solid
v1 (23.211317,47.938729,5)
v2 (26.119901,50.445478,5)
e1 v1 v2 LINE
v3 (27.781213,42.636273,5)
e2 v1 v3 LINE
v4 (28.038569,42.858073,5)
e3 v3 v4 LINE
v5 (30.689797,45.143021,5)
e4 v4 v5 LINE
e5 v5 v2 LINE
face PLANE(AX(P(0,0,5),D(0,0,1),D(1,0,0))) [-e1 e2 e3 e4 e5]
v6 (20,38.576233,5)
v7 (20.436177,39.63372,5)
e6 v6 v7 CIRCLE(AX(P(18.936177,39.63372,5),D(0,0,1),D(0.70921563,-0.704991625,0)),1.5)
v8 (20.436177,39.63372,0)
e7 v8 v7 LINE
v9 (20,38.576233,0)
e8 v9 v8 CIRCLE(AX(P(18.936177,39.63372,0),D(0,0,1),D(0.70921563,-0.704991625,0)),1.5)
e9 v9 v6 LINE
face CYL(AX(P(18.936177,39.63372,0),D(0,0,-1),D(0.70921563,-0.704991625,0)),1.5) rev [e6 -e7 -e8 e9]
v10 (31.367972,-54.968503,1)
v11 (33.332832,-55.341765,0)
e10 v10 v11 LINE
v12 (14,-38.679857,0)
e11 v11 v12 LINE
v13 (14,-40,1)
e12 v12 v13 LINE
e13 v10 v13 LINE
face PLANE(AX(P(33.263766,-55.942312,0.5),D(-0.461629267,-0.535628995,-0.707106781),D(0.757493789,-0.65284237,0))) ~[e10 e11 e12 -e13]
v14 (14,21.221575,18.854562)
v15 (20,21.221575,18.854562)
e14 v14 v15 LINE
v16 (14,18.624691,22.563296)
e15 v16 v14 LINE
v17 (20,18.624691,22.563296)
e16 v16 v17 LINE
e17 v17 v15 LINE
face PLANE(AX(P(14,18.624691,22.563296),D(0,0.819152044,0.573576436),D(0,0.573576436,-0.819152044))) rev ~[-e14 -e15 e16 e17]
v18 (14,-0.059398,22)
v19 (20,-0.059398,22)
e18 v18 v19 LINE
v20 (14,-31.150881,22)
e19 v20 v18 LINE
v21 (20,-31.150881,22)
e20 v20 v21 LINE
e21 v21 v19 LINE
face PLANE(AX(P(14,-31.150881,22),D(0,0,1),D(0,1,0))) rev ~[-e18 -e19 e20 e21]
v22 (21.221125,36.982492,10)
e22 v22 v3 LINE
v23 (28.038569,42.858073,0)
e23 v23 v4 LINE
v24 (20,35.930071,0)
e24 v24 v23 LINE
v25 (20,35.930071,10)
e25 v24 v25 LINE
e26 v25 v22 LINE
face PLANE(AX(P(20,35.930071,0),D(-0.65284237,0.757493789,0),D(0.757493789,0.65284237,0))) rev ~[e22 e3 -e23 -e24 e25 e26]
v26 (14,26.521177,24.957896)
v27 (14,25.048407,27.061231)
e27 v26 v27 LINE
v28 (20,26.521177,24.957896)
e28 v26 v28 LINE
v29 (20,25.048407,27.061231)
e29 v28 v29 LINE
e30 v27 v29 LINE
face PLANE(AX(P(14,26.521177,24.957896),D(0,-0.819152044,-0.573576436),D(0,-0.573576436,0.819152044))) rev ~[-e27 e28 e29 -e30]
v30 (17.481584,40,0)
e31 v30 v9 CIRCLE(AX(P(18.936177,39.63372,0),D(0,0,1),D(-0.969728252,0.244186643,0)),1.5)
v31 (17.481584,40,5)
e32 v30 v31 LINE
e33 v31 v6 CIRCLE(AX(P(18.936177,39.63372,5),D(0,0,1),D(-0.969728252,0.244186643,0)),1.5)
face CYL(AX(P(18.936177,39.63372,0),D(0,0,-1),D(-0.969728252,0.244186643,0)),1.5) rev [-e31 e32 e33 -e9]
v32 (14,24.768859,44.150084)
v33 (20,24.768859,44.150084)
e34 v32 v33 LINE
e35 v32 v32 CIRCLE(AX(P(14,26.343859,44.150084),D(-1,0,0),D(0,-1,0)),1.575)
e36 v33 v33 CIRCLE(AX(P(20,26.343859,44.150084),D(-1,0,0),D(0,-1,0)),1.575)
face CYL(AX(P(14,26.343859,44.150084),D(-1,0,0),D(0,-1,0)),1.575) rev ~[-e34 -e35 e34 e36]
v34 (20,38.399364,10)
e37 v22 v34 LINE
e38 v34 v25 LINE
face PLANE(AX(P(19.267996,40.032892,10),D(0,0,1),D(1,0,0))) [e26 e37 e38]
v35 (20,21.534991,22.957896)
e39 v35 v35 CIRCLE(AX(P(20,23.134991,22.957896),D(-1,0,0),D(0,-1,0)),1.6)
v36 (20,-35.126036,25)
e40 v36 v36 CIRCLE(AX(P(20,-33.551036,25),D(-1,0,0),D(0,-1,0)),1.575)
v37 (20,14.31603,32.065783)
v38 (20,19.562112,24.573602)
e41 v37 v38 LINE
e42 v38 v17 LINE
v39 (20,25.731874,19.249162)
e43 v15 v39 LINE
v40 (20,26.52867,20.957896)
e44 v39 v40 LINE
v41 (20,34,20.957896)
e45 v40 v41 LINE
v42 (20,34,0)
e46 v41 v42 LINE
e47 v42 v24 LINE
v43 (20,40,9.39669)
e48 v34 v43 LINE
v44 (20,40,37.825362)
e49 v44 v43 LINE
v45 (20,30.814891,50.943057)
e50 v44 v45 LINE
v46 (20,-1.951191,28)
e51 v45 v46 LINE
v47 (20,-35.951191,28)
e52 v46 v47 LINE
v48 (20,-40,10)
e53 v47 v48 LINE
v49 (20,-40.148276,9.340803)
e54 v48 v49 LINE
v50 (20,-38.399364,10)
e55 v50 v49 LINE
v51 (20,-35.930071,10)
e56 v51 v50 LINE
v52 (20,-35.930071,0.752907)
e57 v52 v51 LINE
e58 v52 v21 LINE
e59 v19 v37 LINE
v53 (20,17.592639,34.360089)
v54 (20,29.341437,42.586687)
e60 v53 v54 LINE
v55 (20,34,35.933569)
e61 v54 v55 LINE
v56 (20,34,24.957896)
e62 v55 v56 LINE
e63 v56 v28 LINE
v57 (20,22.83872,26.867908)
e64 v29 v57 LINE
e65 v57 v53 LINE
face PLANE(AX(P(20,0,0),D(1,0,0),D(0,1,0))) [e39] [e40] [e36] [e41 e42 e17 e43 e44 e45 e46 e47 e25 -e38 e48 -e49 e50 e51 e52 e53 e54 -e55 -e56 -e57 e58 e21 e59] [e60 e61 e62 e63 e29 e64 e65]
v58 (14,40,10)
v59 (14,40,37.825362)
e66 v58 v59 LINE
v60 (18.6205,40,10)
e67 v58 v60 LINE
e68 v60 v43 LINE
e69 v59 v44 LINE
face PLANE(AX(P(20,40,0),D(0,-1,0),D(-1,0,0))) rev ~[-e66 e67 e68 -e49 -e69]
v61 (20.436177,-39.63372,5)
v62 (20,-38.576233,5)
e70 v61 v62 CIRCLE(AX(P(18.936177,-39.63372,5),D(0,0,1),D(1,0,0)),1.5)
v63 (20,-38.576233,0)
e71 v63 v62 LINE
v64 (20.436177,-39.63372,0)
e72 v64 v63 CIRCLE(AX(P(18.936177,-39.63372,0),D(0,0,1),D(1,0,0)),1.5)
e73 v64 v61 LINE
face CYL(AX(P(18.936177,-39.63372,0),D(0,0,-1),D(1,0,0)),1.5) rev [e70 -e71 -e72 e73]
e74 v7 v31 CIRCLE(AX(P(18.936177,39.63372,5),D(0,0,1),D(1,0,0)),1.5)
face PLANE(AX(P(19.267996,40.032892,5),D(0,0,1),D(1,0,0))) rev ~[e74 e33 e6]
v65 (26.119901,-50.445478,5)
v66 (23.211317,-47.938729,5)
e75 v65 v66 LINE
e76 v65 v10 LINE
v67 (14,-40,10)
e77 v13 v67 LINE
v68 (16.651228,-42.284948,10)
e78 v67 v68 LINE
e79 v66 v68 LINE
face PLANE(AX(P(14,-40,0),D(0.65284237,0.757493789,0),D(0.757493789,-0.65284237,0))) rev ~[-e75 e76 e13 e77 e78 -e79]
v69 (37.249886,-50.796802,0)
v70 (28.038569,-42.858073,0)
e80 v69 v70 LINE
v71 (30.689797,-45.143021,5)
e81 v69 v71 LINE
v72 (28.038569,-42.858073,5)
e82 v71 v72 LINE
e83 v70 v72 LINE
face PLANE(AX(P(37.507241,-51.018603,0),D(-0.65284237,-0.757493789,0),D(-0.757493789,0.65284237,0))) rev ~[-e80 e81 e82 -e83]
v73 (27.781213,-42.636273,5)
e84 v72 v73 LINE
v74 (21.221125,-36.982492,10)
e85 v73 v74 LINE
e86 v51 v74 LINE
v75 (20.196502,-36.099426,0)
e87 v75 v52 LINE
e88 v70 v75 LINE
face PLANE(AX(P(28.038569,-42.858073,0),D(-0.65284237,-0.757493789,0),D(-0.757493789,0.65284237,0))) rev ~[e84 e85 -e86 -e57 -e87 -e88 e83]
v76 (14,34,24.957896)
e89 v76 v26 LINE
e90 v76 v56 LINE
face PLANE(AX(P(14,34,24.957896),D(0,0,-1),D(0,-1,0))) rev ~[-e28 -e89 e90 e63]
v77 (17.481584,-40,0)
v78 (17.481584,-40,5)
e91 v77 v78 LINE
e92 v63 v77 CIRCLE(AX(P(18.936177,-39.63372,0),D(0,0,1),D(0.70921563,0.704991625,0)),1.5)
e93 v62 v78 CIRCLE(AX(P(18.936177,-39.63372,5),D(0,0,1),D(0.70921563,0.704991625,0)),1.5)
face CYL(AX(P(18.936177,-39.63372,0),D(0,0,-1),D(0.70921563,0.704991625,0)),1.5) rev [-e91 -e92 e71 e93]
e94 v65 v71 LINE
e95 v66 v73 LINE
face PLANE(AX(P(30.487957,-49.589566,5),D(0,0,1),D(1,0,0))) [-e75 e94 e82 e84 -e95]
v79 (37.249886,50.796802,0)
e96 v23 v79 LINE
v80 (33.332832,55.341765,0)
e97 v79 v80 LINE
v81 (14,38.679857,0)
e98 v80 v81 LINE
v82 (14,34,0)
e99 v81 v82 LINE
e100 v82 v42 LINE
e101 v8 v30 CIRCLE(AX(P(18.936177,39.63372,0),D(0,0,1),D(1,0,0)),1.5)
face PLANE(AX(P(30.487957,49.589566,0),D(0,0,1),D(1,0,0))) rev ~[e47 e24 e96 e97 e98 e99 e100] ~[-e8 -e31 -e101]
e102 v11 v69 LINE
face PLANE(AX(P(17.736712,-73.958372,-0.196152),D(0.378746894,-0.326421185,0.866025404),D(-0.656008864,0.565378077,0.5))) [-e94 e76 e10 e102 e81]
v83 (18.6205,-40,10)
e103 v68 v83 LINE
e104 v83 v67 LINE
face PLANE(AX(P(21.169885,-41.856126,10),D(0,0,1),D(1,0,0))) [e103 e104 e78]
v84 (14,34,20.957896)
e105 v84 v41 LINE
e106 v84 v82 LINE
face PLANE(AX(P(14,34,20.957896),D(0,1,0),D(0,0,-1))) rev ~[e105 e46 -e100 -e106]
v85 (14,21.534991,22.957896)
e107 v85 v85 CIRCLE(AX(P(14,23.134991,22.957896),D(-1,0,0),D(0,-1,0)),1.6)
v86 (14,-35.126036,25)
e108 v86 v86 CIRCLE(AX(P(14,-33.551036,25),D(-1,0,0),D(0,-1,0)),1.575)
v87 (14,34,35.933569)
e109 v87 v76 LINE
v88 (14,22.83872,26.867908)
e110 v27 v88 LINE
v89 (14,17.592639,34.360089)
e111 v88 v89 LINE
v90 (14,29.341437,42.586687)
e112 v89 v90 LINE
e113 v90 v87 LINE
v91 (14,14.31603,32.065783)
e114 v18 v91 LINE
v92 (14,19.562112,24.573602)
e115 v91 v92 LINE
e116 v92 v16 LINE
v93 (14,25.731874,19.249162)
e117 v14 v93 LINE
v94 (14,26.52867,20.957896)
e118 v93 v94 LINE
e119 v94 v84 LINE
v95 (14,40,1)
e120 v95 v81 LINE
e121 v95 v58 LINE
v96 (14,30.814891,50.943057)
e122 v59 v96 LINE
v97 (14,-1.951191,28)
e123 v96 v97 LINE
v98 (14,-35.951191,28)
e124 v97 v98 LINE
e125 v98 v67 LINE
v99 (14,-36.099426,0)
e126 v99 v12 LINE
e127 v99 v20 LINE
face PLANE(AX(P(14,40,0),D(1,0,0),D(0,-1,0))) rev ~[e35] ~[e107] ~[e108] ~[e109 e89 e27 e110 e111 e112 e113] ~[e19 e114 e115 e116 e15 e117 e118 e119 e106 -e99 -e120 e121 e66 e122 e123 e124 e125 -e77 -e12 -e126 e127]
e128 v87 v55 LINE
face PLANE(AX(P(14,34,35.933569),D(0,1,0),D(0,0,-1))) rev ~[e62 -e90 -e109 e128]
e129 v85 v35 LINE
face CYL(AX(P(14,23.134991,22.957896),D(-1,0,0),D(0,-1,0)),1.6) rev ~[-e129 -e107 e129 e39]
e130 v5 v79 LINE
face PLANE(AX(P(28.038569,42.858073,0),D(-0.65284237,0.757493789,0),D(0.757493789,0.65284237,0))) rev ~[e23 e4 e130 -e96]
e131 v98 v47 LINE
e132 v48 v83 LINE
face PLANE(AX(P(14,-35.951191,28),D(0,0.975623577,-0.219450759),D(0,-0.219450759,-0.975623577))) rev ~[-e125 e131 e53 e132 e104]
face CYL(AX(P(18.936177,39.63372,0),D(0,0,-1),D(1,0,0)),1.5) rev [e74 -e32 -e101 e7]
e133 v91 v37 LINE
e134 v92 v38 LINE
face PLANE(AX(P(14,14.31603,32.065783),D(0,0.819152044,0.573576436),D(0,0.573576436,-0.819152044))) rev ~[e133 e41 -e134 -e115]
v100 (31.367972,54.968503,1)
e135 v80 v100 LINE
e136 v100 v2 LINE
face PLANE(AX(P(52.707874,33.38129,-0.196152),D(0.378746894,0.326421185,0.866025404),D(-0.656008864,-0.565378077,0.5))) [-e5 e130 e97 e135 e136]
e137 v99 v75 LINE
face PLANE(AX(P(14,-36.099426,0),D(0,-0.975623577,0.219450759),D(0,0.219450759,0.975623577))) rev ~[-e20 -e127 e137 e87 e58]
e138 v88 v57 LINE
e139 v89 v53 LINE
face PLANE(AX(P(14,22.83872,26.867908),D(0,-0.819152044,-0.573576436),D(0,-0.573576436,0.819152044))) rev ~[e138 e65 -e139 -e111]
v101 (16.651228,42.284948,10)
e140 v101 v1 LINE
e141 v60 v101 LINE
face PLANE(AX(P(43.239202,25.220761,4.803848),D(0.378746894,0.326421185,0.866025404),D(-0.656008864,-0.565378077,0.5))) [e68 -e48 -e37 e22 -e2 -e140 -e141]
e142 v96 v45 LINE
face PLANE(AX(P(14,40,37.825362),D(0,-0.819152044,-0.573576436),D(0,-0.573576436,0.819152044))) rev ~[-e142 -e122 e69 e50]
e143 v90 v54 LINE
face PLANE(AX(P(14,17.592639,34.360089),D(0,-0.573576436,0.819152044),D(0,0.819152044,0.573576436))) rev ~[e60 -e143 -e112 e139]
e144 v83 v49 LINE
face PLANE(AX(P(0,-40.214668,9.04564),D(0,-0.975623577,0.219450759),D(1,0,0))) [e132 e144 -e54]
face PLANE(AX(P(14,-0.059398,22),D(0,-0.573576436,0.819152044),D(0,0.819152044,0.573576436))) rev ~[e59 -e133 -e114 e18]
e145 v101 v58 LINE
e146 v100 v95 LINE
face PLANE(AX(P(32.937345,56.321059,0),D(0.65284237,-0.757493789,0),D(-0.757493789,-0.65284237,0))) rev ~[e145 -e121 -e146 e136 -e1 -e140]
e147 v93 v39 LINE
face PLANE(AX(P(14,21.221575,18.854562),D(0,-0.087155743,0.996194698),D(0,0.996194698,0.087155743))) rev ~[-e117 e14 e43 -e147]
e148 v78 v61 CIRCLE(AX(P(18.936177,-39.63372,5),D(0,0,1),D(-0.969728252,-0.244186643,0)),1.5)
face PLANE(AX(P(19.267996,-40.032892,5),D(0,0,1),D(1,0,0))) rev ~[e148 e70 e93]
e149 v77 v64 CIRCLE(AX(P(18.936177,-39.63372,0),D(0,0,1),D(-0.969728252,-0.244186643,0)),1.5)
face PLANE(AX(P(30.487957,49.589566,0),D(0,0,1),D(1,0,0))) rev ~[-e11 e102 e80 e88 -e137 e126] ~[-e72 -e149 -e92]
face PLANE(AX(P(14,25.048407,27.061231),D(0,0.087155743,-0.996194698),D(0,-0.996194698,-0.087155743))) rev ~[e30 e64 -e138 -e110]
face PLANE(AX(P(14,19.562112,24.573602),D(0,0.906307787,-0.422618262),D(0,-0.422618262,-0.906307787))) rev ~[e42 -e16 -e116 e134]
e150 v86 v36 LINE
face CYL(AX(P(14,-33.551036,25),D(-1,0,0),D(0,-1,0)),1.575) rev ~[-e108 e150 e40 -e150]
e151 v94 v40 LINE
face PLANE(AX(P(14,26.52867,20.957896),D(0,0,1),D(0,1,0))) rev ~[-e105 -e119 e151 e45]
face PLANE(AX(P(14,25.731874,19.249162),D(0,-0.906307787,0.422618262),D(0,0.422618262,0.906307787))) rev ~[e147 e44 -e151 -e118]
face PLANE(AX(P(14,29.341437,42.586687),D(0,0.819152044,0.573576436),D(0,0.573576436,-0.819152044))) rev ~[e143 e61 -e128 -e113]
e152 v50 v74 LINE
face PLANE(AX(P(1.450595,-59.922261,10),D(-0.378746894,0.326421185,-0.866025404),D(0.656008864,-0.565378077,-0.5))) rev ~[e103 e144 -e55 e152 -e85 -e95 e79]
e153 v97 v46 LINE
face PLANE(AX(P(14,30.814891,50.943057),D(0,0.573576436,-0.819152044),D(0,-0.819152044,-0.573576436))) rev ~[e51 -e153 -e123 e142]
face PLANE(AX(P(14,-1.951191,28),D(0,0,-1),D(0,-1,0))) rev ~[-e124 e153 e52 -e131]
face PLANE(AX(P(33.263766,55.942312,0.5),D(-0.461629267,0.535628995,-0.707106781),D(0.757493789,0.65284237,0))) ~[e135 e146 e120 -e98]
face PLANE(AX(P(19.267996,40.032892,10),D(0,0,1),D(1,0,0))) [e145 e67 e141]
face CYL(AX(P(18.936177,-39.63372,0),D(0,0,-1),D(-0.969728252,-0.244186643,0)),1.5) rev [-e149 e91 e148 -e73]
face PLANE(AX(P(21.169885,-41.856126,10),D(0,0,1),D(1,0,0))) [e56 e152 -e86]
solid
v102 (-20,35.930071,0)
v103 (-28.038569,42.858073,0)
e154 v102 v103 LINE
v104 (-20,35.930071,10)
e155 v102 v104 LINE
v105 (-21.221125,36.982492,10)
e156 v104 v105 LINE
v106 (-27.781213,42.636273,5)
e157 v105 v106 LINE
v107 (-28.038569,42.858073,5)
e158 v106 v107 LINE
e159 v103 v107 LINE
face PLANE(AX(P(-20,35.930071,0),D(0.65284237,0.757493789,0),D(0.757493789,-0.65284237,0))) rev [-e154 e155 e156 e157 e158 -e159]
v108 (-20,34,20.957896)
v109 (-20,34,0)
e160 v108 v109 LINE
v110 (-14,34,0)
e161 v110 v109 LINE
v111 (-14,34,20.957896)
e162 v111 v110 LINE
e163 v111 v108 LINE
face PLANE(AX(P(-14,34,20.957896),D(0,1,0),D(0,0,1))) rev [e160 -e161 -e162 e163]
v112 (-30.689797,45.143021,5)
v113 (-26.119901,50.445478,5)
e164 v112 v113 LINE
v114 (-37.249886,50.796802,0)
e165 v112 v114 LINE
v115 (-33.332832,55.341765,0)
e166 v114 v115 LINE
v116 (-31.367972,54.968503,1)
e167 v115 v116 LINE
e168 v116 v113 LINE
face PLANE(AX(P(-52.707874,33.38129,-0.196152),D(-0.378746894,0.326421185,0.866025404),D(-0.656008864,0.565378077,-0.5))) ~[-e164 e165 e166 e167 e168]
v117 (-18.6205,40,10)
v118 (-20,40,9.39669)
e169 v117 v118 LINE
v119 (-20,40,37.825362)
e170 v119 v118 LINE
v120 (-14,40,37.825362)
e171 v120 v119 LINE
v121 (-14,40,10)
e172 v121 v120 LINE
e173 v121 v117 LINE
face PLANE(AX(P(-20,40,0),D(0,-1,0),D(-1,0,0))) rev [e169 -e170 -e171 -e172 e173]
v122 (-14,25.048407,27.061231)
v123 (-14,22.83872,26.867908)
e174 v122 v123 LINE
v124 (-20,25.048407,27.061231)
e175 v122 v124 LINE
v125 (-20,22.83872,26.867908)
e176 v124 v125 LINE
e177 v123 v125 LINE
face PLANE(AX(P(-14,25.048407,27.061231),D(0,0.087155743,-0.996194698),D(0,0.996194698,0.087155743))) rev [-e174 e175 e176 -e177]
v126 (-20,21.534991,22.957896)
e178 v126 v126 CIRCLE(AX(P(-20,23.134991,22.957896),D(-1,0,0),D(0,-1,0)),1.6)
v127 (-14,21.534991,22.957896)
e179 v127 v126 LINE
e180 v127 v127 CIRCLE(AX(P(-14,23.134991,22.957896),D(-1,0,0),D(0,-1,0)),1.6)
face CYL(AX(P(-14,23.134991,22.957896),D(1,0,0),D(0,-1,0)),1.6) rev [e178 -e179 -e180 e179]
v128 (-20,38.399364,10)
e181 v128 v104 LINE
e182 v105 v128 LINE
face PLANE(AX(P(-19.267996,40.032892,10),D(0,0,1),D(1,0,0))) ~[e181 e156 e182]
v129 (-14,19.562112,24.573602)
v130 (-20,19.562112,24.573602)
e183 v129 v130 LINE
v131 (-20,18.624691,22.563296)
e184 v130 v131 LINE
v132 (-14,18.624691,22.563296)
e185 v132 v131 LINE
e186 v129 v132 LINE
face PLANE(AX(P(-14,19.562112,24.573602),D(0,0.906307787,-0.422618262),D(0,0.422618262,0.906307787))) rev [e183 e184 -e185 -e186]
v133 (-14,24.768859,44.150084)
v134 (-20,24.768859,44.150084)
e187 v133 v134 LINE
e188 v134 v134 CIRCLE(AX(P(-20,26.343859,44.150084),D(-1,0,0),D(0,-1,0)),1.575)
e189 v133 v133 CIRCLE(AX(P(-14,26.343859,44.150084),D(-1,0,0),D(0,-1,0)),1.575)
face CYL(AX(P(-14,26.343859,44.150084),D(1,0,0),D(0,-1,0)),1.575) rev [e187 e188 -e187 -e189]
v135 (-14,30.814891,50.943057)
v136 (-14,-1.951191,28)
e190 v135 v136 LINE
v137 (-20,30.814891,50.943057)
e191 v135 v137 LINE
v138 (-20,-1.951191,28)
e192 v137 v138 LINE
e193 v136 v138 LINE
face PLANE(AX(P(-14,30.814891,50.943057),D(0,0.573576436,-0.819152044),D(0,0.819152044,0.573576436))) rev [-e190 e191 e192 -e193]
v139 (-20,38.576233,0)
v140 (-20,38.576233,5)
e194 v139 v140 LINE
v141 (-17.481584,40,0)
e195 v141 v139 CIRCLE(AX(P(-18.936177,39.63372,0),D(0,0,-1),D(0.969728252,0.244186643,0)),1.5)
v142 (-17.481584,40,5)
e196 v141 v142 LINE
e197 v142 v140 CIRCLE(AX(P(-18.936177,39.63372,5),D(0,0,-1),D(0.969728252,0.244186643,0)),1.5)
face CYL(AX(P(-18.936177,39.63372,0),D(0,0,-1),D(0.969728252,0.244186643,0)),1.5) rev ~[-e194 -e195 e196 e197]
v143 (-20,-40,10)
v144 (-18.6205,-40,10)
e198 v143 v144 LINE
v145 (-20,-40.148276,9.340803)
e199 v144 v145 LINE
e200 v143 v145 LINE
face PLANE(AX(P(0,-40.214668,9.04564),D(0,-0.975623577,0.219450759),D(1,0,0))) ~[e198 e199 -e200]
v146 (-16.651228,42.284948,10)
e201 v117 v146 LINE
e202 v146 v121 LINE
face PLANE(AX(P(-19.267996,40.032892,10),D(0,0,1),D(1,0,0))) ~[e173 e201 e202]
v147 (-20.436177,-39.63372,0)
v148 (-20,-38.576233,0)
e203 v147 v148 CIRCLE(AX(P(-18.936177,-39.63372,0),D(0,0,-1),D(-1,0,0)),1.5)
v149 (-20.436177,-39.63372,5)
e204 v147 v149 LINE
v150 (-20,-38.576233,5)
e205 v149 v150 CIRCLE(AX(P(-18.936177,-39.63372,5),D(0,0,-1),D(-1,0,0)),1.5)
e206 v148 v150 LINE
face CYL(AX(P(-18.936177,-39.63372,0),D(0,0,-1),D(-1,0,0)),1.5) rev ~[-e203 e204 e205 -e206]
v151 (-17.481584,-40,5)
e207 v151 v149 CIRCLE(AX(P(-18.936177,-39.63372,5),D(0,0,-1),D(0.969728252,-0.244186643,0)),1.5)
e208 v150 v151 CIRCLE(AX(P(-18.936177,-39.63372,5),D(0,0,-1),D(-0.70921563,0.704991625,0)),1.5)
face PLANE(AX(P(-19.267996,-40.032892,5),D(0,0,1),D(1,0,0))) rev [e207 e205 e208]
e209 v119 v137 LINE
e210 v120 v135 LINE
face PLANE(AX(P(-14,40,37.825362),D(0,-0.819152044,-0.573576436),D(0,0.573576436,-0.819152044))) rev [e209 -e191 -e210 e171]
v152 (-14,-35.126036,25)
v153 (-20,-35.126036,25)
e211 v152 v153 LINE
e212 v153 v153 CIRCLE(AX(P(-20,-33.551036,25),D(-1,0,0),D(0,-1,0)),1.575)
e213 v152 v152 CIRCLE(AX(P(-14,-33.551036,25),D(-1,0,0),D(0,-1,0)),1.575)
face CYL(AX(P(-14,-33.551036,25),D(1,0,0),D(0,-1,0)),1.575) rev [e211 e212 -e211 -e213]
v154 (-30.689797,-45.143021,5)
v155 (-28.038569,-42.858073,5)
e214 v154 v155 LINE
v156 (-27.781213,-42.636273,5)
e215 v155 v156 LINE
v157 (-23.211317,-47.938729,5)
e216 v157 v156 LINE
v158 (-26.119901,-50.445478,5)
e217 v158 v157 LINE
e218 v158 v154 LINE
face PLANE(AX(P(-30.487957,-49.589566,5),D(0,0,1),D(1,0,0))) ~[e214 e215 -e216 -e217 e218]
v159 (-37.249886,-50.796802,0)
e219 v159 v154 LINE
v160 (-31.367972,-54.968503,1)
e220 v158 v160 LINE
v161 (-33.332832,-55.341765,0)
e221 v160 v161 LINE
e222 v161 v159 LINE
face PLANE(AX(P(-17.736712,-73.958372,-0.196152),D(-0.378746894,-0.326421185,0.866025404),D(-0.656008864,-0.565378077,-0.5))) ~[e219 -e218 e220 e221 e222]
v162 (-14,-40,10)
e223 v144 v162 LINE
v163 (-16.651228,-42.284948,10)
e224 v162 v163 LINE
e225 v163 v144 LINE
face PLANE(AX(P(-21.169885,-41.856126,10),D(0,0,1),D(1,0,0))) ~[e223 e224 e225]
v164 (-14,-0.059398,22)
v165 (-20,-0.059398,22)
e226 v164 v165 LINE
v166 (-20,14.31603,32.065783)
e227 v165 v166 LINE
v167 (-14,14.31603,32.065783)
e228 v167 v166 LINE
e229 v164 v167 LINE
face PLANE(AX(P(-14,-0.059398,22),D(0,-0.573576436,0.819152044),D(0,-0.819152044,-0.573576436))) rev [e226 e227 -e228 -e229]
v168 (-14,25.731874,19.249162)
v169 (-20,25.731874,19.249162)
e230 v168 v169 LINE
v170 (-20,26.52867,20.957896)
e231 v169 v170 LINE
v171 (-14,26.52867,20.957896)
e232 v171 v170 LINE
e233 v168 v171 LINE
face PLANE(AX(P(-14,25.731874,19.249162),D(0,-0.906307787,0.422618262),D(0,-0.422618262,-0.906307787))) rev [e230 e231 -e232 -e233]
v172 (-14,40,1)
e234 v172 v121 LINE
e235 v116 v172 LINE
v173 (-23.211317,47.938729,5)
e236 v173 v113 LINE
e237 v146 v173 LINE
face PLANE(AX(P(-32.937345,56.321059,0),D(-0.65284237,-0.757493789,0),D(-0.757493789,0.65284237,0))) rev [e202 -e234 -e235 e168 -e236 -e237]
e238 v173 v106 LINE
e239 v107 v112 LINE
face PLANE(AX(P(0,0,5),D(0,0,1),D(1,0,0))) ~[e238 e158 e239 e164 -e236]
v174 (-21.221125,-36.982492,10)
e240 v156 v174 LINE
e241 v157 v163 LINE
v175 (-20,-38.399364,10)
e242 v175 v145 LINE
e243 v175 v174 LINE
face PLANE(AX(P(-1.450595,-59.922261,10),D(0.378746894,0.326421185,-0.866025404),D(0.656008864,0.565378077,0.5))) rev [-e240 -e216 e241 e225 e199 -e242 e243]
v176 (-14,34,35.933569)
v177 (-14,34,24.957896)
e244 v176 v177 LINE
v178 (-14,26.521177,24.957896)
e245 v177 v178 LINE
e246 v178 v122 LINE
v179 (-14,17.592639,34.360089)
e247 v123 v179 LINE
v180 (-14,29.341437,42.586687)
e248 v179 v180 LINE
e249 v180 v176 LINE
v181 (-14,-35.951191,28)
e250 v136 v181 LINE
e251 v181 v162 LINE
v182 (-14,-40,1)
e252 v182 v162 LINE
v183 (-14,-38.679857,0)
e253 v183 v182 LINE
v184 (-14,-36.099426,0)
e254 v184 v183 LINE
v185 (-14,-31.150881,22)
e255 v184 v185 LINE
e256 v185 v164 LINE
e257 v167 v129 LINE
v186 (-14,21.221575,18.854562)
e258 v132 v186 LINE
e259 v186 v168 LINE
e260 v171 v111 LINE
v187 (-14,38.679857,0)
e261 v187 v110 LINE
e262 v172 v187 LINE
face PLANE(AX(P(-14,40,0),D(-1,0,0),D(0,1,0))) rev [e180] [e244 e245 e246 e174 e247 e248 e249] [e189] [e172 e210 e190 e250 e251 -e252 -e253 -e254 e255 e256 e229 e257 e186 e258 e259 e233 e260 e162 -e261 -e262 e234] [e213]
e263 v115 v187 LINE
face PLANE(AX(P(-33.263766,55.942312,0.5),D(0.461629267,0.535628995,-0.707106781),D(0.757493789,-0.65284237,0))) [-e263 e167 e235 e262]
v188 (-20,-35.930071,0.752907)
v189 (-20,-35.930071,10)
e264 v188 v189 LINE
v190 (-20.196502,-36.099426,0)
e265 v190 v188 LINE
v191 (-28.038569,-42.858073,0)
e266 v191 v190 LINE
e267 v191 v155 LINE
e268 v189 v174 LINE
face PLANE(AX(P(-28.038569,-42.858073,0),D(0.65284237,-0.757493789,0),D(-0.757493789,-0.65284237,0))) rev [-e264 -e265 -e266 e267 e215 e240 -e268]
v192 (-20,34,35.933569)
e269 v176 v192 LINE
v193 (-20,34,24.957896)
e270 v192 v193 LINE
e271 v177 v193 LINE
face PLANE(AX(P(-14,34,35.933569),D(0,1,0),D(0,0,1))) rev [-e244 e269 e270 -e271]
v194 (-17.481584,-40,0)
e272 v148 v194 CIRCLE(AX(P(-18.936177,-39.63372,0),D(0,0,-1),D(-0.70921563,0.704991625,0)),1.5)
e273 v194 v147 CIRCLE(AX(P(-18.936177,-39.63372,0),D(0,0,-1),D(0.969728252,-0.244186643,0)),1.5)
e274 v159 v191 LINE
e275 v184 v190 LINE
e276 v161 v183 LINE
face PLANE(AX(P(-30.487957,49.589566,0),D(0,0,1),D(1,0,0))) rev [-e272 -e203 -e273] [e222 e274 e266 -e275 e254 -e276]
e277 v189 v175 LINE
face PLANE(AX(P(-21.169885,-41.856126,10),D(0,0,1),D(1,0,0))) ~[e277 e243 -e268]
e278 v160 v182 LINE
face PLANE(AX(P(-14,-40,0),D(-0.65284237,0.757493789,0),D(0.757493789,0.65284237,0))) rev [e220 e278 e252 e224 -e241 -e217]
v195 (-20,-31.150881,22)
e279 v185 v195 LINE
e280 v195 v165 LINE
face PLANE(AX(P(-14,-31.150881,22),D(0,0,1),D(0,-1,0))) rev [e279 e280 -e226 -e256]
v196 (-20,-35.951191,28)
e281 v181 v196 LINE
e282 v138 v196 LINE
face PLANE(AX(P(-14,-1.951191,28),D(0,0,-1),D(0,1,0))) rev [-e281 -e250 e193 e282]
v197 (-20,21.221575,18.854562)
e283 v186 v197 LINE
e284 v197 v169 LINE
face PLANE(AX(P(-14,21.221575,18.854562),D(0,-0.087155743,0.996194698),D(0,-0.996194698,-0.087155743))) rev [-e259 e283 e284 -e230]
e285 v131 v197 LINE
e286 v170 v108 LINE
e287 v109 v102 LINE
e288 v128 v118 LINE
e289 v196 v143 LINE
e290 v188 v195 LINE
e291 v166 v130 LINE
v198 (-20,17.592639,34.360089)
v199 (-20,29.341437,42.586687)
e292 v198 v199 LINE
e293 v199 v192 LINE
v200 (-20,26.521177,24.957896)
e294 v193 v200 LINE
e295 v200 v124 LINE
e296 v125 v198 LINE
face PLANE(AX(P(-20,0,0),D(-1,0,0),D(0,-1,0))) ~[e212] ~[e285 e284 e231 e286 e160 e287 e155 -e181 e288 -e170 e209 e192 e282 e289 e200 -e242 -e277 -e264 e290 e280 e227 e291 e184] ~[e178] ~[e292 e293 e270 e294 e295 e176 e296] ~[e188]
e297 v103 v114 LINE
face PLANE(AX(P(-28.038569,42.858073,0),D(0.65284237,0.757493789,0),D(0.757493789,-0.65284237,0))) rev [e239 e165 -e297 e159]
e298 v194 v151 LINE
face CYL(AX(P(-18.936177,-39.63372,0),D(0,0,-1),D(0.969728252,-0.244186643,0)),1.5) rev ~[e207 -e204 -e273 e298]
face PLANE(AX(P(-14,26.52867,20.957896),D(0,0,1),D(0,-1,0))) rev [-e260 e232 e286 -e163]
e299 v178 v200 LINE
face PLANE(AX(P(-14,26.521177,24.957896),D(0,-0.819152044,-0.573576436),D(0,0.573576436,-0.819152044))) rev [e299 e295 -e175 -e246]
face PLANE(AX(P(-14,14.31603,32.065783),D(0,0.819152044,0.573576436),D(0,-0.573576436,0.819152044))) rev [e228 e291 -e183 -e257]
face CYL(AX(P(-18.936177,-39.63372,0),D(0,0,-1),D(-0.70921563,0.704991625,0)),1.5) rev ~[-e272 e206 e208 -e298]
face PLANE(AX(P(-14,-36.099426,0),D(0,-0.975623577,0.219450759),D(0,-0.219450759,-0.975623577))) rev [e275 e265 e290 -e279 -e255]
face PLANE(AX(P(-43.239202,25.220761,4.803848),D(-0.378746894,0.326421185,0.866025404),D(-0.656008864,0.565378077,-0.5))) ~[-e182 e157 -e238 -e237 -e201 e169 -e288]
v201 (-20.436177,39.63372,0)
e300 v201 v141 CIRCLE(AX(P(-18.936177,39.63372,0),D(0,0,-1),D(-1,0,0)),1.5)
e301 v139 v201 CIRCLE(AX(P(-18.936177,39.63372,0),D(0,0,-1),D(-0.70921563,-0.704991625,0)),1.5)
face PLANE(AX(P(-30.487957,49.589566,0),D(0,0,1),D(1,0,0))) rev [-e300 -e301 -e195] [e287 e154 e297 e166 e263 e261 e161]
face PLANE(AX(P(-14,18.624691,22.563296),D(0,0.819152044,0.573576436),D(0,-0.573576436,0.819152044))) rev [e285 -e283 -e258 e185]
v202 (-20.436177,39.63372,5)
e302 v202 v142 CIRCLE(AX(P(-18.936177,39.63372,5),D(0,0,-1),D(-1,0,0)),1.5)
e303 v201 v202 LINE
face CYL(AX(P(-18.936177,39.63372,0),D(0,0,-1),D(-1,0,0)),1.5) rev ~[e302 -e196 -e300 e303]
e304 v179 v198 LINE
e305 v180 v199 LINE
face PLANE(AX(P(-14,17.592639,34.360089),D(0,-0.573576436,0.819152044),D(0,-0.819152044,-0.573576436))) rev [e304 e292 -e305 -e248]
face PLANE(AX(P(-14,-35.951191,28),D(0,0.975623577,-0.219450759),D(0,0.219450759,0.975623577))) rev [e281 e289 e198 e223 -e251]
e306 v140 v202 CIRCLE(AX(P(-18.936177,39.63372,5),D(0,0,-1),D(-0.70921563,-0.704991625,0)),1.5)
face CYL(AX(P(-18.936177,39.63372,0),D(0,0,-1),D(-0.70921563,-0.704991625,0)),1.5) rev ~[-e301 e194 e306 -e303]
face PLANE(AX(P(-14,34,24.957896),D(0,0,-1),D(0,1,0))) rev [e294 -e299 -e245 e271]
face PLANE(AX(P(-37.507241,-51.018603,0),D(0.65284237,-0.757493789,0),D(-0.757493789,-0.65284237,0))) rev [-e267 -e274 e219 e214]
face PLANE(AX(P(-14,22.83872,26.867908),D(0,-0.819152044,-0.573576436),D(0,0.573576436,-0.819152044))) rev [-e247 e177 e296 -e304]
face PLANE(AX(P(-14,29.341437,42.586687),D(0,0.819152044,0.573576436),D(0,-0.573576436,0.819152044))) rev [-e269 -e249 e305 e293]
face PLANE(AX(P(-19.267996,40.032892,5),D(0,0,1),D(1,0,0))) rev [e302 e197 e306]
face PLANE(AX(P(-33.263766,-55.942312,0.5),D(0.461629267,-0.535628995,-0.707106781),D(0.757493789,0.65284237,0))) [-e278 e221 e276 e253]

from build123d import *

# Parameters (mm, degrees)
F1_DEPTH     = 70
F2_DEPTH     = 10
F3_DEPTH     = 5
F4_R         = 1.6
F4_R_2       = 1.575
F5_DEPTH     = 25
F6_DEPTH     = 5
F7_SIZE      = 1
F8_T1_DEPTH  = 53.5675435836
F8_T6_DEPTH  = 53.5675435836
F8_T13_DEPTH = 53.5675435836
F8_T19_DEPTH = 53.5675435836
F8_T26_DEPTH = 53.5675435836
F8_T33_DEPTH = 53.5675435836
F9_T1_DEPTH  = 53.5675435836
F9_T6_DEPTH  = 53.5675435836
F9_T12_DEPTH = 53.5675435836
F9_T19_DEPTH = 53.5675435836
F9_T26_DEPTH = 53.5675435836
F9_T32_DEPTH = 53.5675435836


# Not quite as in the source:
# - a fillet or chamfer that OpenCascade refuses, or shapes differently, is made with other operations: its cross-section is extruded or revolved along the edge and cut away or added


with BuildPart() as f1:
    # F0 (on Top) → F1 (new body)
    with BuildSketch(Plane.XY):
        with BuildLine():
            Line((17.481584177, 40), (14, 40))
            Line((14, 40), (18.5698965916, 34.6975434805))
            Line((18.5698965916, 34.6975434805), (20, 35.9300712093))
            Line((20, 35.9300712093), (20, 38.5762325992))
            ThreePointArc((20, 38.5762325992), (18.1979669018, 38.327945742), (17.481584177, 40))
        make_face()
        with BuildLine():
            Line((20, 40), (17.481584177, 40))
            ThreePointArc((17.481584177, 40), (18.1979669018, 38.327945742), (20, 38.5762325992))
            Line((20, 38.5762325992), (20, 40))
        make_face()
        Polygon((18.5698965916, 34.6975434805), (14, 40), (14, 0), (14, -40), (18.5698965916, -34.6975434805), (20, -35.9300712093), (20, 0), (20, 35.9300712093), align=None)
        with BuildLine():
            Line((18.5698965916, -34.6975434805), (14, -40))
            Line((14, -40), (17.481584177, -40))
            ThreePointArc((17.481584177, -40), (18.1979669018, -38.327945742), (20, -38.5762325992))
            Line((20, -38.5762325992), (20, -35.9300712093))
            Line((20, -35.9300712093), (18.5698965916, -34.6975434805))
        make_face()
        with BuildLine():
            ThreePointArc((20, -38.5762325992), (18.1979669018, -38.327945742), (17.481584177, -40))
            Line((17.481584177, -40), (20, -40))
            Line((20, -40), (20, -38.5762325992))
        make_face()
    extrude(amount=F1_DEPTH)

    # F0 (on Top) → F2 (join)
    with BuildSketch(Plane.XY):
        with BuildLine():
            ThreePointArc((20.4361765556, 39.633720036), (19.1207184642, 41.1223248473), (17.481584177, 40))
            Line((17.481584177, 40), (20, 40))
            Line((20, 40), (20, 38.5762325992))
            ThreePointArc((20, 38.5762325992), (20.3228515656, 39.0617651281), (20.4361765556, 39.633720036))
        make_face()
        with BuildLine():
            Line((23.4686723563, 48.1605296279), (14, 40))
            Line((14, 40), (17.481584177, 40))
            ThreePointArc((17.481584177, 40), (19.1207184642, 41.1223248473), (20.4361765556, 39.633720036))
            ThreePointArc((20.4361765556, 39.633720036), (20.3228515656, 39.0617651281), (20, 38.5762325992))
            Line((20, 38.5762325992), (20, 35.9300712093))
            Line((20, 35.9300712093), (28.038568948, 42.8580731084))
            Line((28.038568948, 42.8580731084), (23.4686723563, 48.1605296279))
        make_face()
        with BuildLine():
            Line((17.481584177, -40), (14, -40))
            Line((14, -40), (23.4686723563, -48.1605296279))
            Line((23.4686723563, -48.1605296279), (28.038568948, -42.8580731084))
            Line((28.038568948, -42.8580731084), (20, -35.9300712093))
            Line((20, -35.9300712093), (20, -38.5762325992))
            ThreePointArc((20, -38.5762325992), (20.3228515656, -39.0617651281), (20.4361765556, -39.633720036))
            ThreePointArc((20.4361765556, -39.633720036), (19.1207184642, -41.1223248473), (17.481584177, -40))
        make_face()
        with BuildLine():
            Line((20, -40), (17.481584177, -40))
            ThreePointArc((17.481584177, -40), (19.1207184642, -41.1223248473), (20.4361765556, -39.633720036))
            ThreePointArc((20.4361765556, -39.633720036), (20.3228515656, -39.0617651281), (20, -38.5762325992))
            Line((20, -38.5762325992), (20, -40))
        make_face()
    extrude(amount=F2_DEPTH)

    # F0 (on Top) → F3 (join)
    with BuildSketch(Plane.XY):
        Polygon((32.9373447127, 56.3210592559), (23.4686723563, 48.1605296279), (28.038568948, 42.8580731084), (37.5072413043, 51.0186027363), align=None)
        Polygon((28.038568948, -42.8580731084), (23.4686723563, -48.1605296279), (32.9373447127, -56.3210592559), (37.5072413043, -51.0186027363), align=None)
    extrude(amount=F3_DEPTH)

    # F4 (on face) → F5 (cut)
    with BuildSketch(Plane(origin=(14, 0, 0), x_dir=(0, -1, 0), z_dir=(-1, 0, 0))):
        Polygon((-34, 0), (36.0994255375, 0), (31.1508810268, 22), (0.0593981216, 22), (-14.3160304975, 32.0657834841), (-19.5621121893, 24.5736023727), (-18.6246911161, 22.5632963938), (-21.2215746664, 18.8545623277), (-25.7318743586, 19.2491624199), (-26.5286701393, 20.9578964859), (-34, 20.9578964859), align=None)
        Polygon((-30.8148909167, 50.943057454), (1.9511908549, 28), (35.9511908549, 28), (40, 10), (40, 70), (-40, 70), (-40, 37.825362225), align=None)
        Polygon((-34, 24.9578964859), (-26.5211773832, 24.9578964859), (-25.0484069503, 27.0612306442), (-22.8387203665, 26.8679081181), (-17.5926386747, 34.3600892295), (-29.3414372691, 42.5866865702), (-34, 35.9335694917), align=None)
        with Locations((-23.1349908083, 22.9578964859)):
            Circle(F4_R)
        with Locations((-26.3438594686, 44.1500837642)):
            Circle(F4_R_2)
        with Locations((33.5510359408, 25)):
            Circle(F4_R_2)
    extrude(amount=-F5_DEPTH, mode=Mode.SUBTRACT)

    # F0 (on Top) → F6 (cut)
    with BuildSketch(Plane.XY):
        with BuildLine():
            Line((20, -40), (17.481584177, -40))
            ThreePointArc((17.481584177, -40), (19.1207184642, -41.1223248473), (20.4361765556, -39.633720036))
            ThreePointArc((20.4361765556, -39.633720036), (20.3228515656, -39.0617651281), (20, -38.5762325992))
            Line((20, -38.5762325992), (20, -40))
        make_face()
        with BuildLine():
            ThreePointArc((20, -38.5762325992), (18.1979669018, -38.327945742), (17.481584177, -40))
            Line((17.481584177, -40), (20, -40))
            Line((20, -40), (20, -38.5762325992))
        make_face()
        with BuildLine():
            ThreePointArc((20.4361765556, 39.633720036), (19.1207184642, 41.1223248473), (17.481584177, 40))
            Line((17.481584177, 40), (20, 40))
            Line((20, 40), (20, 38.5762325992))
            ThreePointArc((20, 38.5762325992), (20.3228515656, 39.0617651281), (20.4361765556, 39.633720036))
        make_face()
        with BuildLine():
            Line((20, 40), (17.481584177, 40))
            ThreePointArc((17.481584177, 40), (18.1979669018, 38.327945742), (20, 38.5762325992))
            Line((20, 38.5762325992), (20, 40))
        make_face()
    extrude(amount=F6_DEPTH, mode=Mode.SUBTRACT)

    # F7
    f7_edges = [f1.edges().sort_by_distance(p)[0] for p in [
        (23.468672, -48.16053, 0),
        (23.468672, 48.16053, 0),
    ]]
    chamfer(f7_edges, length=F7_SIZE)

    # F8: chamfer of 9 x 5.1961524227 on 2 edges, made by hand

    # F8_s2 → F8_t1 (cut)
    with BuildSketch(Plane(origin=(-29.0147501324, -33.6658495258, 0), x_dir=(0, 0, 1), z_dir=(0.6528423702, 0.7574937885, 0))):
        Polygon((-0.1961524227, 61.7186078485), (5, 52.7186078485), (5, 61.7186078485), align=None)
    extrude(amount=F8_T1_DEPTH, mode=Mode.SUBTRACT)


with BuildPart() as f8_tool4:
    # F8_s5 → F8_t6 (new body)
    with BuildSketch(Plane(origin=(-29.0147501324, -33.6658495258, 0), x_dir=(0, 0, 1), z_dir=(0.6528423702, 0.7574937885, 0))):
        Polygon((10, 40.2186078485), (4.8038475773, 49.2186078485), (10, 49.2186078485), align=None)
    extrude(amount=F8_T6_DEPTH)

    split(bisect_by=Plane(origin=(0, -40.2146679203, 9.0456397358), x_dir=(1, 0, 0), z_dir=(0, -0.9756235772, 0.219450759)), keep=Keep.TOP)

    split(bisect_by=Plane.YZ.offset(20), keep=Keep.BOTTOM)

    split(bisect_by=Plane.XY.offset(5), keep=Keep.TOP)


with BuildPart() as f1_1:
    add(f1.part)

    # F8_t3: cut F8_tool4
    add(f8_tool4.part, mode=Mode.SUBTRACT)


with BuildPart() as f8_tool11:
    # F8_s12 → F8_t13 (new body)
    with BuildSketch(Plane(origin=(-29.0147501324, -33.6658495258, 0), x_dir=(0, 0, 1), z_dir=(0.6528423702, 0.7574937885, 0))):
        Polygon((10, 40.2186078485), (4.8038475773, 49.2186078485), (10, 49.2186078485), align=None)
    extrude(amount=F8_T13_DEPTH)

    split(bisect_by=Plane.YZ.offset(20), keep=Keep.BOTTOM)

    split(bisect_by=Plane.XY.offset(5), keep=Keep.BOTTOM)


with BuildPart() as f1_2:
    add(f1_1.part)

    # F8_t10: cut F8_tool11
    add(f8_tool11.part, mode=Mode.SUBTRACT)


with BuildPart() as f8_tool17:
    # F8_s18 → F8_t19 (new body)
    with BuildSketch(Plane(origin=(-29.0147501324, -33.6658495258, 0), x_dir=(0, 0, 1), z_dir=(0.6528423702, 0.7574937885, 0))):
        Polygon((10, 40.2186078485), (4.8038475773, 49.2186078485), (10, 49.2186078485), align=None)
    extrude(amount=F8_T19_DEPTH)

    split(bisect_by=Plane(origin=(0, -40.2146679203, 9.0456397358), x_dir=(1, 0, 0), z_dir=(0, -0.9756235772, 0.219450759)), keep=Keep.TOP)

    split(bisect_by=Plane.YZ.offset(20), keep=Keep.TOP)

    split(bisect_by=Plane.XY.offset(5), keep=Keep.TOP)


with BuildPart() as f1_3:
    add(f1_2.part)

    # F8_t16: cut F8_tool17
    add(f8_tool17.part, mode=Mode.SUBTRACT)


with BuildPart() as f8_tool24:
    # F8_s25 → F8_t26 (new body)
    with BuildSketch(Plane(origin=(-29.0147501324, -33.6658495258, 0), x_dir=(0, 0, 1), z_dir=(0.6528423702, 0.7574937885, 0))):
        Polygon((10, 40.2186078485), (4.8038475773, 49.2186078485), (10, 49.2186078485), align=None)
    extrude(amount=F8_T26_DEPTH)

    split(bisect_by=Plane(origin=(0, -40.2146679203, 9.0456397358), x_dir=(1, 0, 0), z_dir=(0, 0.9756235772, -0.219450759)), keep=Keep.TOP)

    split(bisect_by=Plane.YZ.offset(20), keep=Keep.TOP)

    split(bisect_by=Plane.XY.offset(5), keep=Keep.TOP)


with BuildPart() as f1_4:
    add(f1_3.part)

    # F8_t23: cut F8_tool24
    add(f8_tool24.part, mode=Mode.SUBTRACT)


with BuildPart() as f8_tool31:
    # F8_s32 → F8_t33 (new body)
    with BuildSketch(Plane(origin=(-29.0147501324, -33.6658495258, 0), x_dir=(0, 0, 1), z_dir=(0.6528423702, 0.7574937885, 0))):
        Polygon((10, 40.2186078485), (4.8038475773, 49.2186078485), (10, 49.2186078485), align=None)
    extrude(amount=F8_T33_DEPTH)

    split(bisect_by=Plane(origin=(0, -40.2146679203, 9.0456397358), x_dir=(1, 0, 0), z_dir=(0, 0.9756235772, -0.219450759)), keep=Keep.TOP)

    split(bisect_by=Plane.XY.offset(5), keep=Keep.BOTTOM)


with BuildPart() as f1_5:
    add(f1_4.part)

    # F8_t30: cut F8_tool31
    add(f8_tool31.part, mode=Mode.SUBTRACT)

    # F9: chamfer of 9 x 5.1961524227 on 2 edges, made by hand

    # F9_s2 → F9_t1 (cut)
    with BuildSketch(Plane(origin=(5.9564119884, -6.9112320044, 0), x_dir=(0, 0, 1), z_dir=(-0.6528423702, 0.7574937885, 0))):
        Polygon((-0.1961524227, 61.7186078485), (5, 52.7186078485), (5, 61.7186078485), align=None)
    extrude(amount=F9_T1_DEPTH, mode=Mode.SUBTRACT)


with BuildPart() as f9_tool4:
    # F9_s5 → F9_t6 (new body)
    with BuildSketch(Plane(origin=(5.9564119884, -6.9112320044, 0), x_dir=(0, 0, 1), z_dir=(-0.6528423702, 0.7574937885, 0))):
        Polygon((4.8038475773, 49.2186078485), (10, 40.2186078485), (10, 49.2186078485), align=None)
    extrude(amount=F9_T6_DEPTH)

    split(bisect_by=Plane.XY.offset(5), keep=Keep.BOTTOM)

    split(bisect_by=Plane.XZ.offset(-40), keep=Keep.TOP)


with BuildPart() as f1_6:
    add(f1_5.part)

    # F9_t3: cut F9_tool4
    add(f9_tool4.part, mode=Mode.SUBTRACT)


with BuildPart() as f9_tool10:
    # F9_s11 → F9_t12 (new body)
    with BuildSketch(Plane(origin=(5.9564119884, -6.9112320044, 0), x_dir=(0, 0, 1), z_dir=(-0.6528423702, 0.7574937885, 0))):
        Polygon((4.8038475773, 49.2186078485), (10, 40.2186078485), (10, 49.2186078485), align=None)
    extrude(amount=F9_T12_DEPTH)

    split(bisect_by=Plane.YZ.offset(20), keep=Keep.TOP)

    split(bisect_by=Plane.XY.offset(5), keep=Keep.TOP)

    split(bisect_by=Plane.XZ.offset(-40), keep=Keep.TOP)


with BuildPart() as f1_7:
    add(f1_6.part)

    # F9_t9: cut F9_tool10
    add(f9_tool10.part, mode=Mode.SUBTRACT)


with BuildPart() as f9_tool17:
    # F9_s18 → F9_t19 (new body)
    with BuildSketch(Plane(origin=(5.9564119884, -6.9112320044, 0), x_dir=(0, 0, 1), z_dir=(-0.6528423702, 0.7574937885, 0))):
        Polygon((4.8038475773, 49.2186078485), (10, 40.2186078485), (10, 49.2186078485), align=None)
    extrude(amount=F9_T19_DEPTH)

    split(bisect_by=Plane.YZ.offset(20), keep=Keep.TOP)

    split(bisect_by=Plane.XY.offset(5), keep=Keep.TOP)

    split(bisect_by=Plane.XZ.offset(-40), keep=Keep.BOTTOM)


with BuildPart() as f1_8:
    add(f1_7.part)

    # F9_t16: cut F9_tool17
    add(f9_tool17.part, mode=Mode.SUBTRACT)


with BuildPart() as f9_tool24:
    # F9_s25 → F9_t26 (new body)
    with BuildSketch(Plane(origin=(5.9564119884, -6.9112320044, 0), x_dir=(0, 0, 1), z_dir=(-0.6528423702, 0.7574937885, 0))):
        Polygon((4.8038475773, 49.2186078485), (10, 40.2186078485), (10, 49.2186078485), align=None)
    extrude(amount=F9_T26_DEPTH)

    split(bisect_by=Plane.YZ.offset(20), keep=Keep.BOTTOM)

    split(bisect_by=Plane.XY.offset(5), keep=Keep.BOTTOM)


with BuildPart() as f1_9:
    add(f1_8.part)

    # F9_t23: cut F9_tool24
    add(f9_tool24.part, mode=Mode.SUBTRACT)


with BuildPart() as f9_tool30:
    # F9_s31 → F9_t32 (new body)
    with BuildSketch(Plane(origin=(5.9564119884, -6.9112320044, 0), x_dir=(0, 0, 1), z_dir=(-0.6528423702, 0.7574937885, 0))):
        Polygon((4.8038475773, 49.2186078485), (10, 40.2186078485), (10, 49.2186078485), align=None)
    extrude(amount=F9_T32_DEPTH)

    split(bisect_by=Plane.YZ.offset(20), keep=Keep.BOTTOM)

    split(bisect_by=Plane.XY.offset(5), keep=Keep.TOP)

    split(bisect_by=Plane.XZ.offset(-40), keep=Keep.BOTTOM)


with BuildPart() as f1_10:
    add(f1_9.part)

    # F9_t29: cut F9_tool30
    add(f9_tool30.part, mode=Mode.SUBTRACT)


with BuildPart() as f10_1:
    # F10: instance of F1
    add(f1_10.part.mirror(Plane.YZ))


solid = Compound([f1_10.part, f10_1.part])
